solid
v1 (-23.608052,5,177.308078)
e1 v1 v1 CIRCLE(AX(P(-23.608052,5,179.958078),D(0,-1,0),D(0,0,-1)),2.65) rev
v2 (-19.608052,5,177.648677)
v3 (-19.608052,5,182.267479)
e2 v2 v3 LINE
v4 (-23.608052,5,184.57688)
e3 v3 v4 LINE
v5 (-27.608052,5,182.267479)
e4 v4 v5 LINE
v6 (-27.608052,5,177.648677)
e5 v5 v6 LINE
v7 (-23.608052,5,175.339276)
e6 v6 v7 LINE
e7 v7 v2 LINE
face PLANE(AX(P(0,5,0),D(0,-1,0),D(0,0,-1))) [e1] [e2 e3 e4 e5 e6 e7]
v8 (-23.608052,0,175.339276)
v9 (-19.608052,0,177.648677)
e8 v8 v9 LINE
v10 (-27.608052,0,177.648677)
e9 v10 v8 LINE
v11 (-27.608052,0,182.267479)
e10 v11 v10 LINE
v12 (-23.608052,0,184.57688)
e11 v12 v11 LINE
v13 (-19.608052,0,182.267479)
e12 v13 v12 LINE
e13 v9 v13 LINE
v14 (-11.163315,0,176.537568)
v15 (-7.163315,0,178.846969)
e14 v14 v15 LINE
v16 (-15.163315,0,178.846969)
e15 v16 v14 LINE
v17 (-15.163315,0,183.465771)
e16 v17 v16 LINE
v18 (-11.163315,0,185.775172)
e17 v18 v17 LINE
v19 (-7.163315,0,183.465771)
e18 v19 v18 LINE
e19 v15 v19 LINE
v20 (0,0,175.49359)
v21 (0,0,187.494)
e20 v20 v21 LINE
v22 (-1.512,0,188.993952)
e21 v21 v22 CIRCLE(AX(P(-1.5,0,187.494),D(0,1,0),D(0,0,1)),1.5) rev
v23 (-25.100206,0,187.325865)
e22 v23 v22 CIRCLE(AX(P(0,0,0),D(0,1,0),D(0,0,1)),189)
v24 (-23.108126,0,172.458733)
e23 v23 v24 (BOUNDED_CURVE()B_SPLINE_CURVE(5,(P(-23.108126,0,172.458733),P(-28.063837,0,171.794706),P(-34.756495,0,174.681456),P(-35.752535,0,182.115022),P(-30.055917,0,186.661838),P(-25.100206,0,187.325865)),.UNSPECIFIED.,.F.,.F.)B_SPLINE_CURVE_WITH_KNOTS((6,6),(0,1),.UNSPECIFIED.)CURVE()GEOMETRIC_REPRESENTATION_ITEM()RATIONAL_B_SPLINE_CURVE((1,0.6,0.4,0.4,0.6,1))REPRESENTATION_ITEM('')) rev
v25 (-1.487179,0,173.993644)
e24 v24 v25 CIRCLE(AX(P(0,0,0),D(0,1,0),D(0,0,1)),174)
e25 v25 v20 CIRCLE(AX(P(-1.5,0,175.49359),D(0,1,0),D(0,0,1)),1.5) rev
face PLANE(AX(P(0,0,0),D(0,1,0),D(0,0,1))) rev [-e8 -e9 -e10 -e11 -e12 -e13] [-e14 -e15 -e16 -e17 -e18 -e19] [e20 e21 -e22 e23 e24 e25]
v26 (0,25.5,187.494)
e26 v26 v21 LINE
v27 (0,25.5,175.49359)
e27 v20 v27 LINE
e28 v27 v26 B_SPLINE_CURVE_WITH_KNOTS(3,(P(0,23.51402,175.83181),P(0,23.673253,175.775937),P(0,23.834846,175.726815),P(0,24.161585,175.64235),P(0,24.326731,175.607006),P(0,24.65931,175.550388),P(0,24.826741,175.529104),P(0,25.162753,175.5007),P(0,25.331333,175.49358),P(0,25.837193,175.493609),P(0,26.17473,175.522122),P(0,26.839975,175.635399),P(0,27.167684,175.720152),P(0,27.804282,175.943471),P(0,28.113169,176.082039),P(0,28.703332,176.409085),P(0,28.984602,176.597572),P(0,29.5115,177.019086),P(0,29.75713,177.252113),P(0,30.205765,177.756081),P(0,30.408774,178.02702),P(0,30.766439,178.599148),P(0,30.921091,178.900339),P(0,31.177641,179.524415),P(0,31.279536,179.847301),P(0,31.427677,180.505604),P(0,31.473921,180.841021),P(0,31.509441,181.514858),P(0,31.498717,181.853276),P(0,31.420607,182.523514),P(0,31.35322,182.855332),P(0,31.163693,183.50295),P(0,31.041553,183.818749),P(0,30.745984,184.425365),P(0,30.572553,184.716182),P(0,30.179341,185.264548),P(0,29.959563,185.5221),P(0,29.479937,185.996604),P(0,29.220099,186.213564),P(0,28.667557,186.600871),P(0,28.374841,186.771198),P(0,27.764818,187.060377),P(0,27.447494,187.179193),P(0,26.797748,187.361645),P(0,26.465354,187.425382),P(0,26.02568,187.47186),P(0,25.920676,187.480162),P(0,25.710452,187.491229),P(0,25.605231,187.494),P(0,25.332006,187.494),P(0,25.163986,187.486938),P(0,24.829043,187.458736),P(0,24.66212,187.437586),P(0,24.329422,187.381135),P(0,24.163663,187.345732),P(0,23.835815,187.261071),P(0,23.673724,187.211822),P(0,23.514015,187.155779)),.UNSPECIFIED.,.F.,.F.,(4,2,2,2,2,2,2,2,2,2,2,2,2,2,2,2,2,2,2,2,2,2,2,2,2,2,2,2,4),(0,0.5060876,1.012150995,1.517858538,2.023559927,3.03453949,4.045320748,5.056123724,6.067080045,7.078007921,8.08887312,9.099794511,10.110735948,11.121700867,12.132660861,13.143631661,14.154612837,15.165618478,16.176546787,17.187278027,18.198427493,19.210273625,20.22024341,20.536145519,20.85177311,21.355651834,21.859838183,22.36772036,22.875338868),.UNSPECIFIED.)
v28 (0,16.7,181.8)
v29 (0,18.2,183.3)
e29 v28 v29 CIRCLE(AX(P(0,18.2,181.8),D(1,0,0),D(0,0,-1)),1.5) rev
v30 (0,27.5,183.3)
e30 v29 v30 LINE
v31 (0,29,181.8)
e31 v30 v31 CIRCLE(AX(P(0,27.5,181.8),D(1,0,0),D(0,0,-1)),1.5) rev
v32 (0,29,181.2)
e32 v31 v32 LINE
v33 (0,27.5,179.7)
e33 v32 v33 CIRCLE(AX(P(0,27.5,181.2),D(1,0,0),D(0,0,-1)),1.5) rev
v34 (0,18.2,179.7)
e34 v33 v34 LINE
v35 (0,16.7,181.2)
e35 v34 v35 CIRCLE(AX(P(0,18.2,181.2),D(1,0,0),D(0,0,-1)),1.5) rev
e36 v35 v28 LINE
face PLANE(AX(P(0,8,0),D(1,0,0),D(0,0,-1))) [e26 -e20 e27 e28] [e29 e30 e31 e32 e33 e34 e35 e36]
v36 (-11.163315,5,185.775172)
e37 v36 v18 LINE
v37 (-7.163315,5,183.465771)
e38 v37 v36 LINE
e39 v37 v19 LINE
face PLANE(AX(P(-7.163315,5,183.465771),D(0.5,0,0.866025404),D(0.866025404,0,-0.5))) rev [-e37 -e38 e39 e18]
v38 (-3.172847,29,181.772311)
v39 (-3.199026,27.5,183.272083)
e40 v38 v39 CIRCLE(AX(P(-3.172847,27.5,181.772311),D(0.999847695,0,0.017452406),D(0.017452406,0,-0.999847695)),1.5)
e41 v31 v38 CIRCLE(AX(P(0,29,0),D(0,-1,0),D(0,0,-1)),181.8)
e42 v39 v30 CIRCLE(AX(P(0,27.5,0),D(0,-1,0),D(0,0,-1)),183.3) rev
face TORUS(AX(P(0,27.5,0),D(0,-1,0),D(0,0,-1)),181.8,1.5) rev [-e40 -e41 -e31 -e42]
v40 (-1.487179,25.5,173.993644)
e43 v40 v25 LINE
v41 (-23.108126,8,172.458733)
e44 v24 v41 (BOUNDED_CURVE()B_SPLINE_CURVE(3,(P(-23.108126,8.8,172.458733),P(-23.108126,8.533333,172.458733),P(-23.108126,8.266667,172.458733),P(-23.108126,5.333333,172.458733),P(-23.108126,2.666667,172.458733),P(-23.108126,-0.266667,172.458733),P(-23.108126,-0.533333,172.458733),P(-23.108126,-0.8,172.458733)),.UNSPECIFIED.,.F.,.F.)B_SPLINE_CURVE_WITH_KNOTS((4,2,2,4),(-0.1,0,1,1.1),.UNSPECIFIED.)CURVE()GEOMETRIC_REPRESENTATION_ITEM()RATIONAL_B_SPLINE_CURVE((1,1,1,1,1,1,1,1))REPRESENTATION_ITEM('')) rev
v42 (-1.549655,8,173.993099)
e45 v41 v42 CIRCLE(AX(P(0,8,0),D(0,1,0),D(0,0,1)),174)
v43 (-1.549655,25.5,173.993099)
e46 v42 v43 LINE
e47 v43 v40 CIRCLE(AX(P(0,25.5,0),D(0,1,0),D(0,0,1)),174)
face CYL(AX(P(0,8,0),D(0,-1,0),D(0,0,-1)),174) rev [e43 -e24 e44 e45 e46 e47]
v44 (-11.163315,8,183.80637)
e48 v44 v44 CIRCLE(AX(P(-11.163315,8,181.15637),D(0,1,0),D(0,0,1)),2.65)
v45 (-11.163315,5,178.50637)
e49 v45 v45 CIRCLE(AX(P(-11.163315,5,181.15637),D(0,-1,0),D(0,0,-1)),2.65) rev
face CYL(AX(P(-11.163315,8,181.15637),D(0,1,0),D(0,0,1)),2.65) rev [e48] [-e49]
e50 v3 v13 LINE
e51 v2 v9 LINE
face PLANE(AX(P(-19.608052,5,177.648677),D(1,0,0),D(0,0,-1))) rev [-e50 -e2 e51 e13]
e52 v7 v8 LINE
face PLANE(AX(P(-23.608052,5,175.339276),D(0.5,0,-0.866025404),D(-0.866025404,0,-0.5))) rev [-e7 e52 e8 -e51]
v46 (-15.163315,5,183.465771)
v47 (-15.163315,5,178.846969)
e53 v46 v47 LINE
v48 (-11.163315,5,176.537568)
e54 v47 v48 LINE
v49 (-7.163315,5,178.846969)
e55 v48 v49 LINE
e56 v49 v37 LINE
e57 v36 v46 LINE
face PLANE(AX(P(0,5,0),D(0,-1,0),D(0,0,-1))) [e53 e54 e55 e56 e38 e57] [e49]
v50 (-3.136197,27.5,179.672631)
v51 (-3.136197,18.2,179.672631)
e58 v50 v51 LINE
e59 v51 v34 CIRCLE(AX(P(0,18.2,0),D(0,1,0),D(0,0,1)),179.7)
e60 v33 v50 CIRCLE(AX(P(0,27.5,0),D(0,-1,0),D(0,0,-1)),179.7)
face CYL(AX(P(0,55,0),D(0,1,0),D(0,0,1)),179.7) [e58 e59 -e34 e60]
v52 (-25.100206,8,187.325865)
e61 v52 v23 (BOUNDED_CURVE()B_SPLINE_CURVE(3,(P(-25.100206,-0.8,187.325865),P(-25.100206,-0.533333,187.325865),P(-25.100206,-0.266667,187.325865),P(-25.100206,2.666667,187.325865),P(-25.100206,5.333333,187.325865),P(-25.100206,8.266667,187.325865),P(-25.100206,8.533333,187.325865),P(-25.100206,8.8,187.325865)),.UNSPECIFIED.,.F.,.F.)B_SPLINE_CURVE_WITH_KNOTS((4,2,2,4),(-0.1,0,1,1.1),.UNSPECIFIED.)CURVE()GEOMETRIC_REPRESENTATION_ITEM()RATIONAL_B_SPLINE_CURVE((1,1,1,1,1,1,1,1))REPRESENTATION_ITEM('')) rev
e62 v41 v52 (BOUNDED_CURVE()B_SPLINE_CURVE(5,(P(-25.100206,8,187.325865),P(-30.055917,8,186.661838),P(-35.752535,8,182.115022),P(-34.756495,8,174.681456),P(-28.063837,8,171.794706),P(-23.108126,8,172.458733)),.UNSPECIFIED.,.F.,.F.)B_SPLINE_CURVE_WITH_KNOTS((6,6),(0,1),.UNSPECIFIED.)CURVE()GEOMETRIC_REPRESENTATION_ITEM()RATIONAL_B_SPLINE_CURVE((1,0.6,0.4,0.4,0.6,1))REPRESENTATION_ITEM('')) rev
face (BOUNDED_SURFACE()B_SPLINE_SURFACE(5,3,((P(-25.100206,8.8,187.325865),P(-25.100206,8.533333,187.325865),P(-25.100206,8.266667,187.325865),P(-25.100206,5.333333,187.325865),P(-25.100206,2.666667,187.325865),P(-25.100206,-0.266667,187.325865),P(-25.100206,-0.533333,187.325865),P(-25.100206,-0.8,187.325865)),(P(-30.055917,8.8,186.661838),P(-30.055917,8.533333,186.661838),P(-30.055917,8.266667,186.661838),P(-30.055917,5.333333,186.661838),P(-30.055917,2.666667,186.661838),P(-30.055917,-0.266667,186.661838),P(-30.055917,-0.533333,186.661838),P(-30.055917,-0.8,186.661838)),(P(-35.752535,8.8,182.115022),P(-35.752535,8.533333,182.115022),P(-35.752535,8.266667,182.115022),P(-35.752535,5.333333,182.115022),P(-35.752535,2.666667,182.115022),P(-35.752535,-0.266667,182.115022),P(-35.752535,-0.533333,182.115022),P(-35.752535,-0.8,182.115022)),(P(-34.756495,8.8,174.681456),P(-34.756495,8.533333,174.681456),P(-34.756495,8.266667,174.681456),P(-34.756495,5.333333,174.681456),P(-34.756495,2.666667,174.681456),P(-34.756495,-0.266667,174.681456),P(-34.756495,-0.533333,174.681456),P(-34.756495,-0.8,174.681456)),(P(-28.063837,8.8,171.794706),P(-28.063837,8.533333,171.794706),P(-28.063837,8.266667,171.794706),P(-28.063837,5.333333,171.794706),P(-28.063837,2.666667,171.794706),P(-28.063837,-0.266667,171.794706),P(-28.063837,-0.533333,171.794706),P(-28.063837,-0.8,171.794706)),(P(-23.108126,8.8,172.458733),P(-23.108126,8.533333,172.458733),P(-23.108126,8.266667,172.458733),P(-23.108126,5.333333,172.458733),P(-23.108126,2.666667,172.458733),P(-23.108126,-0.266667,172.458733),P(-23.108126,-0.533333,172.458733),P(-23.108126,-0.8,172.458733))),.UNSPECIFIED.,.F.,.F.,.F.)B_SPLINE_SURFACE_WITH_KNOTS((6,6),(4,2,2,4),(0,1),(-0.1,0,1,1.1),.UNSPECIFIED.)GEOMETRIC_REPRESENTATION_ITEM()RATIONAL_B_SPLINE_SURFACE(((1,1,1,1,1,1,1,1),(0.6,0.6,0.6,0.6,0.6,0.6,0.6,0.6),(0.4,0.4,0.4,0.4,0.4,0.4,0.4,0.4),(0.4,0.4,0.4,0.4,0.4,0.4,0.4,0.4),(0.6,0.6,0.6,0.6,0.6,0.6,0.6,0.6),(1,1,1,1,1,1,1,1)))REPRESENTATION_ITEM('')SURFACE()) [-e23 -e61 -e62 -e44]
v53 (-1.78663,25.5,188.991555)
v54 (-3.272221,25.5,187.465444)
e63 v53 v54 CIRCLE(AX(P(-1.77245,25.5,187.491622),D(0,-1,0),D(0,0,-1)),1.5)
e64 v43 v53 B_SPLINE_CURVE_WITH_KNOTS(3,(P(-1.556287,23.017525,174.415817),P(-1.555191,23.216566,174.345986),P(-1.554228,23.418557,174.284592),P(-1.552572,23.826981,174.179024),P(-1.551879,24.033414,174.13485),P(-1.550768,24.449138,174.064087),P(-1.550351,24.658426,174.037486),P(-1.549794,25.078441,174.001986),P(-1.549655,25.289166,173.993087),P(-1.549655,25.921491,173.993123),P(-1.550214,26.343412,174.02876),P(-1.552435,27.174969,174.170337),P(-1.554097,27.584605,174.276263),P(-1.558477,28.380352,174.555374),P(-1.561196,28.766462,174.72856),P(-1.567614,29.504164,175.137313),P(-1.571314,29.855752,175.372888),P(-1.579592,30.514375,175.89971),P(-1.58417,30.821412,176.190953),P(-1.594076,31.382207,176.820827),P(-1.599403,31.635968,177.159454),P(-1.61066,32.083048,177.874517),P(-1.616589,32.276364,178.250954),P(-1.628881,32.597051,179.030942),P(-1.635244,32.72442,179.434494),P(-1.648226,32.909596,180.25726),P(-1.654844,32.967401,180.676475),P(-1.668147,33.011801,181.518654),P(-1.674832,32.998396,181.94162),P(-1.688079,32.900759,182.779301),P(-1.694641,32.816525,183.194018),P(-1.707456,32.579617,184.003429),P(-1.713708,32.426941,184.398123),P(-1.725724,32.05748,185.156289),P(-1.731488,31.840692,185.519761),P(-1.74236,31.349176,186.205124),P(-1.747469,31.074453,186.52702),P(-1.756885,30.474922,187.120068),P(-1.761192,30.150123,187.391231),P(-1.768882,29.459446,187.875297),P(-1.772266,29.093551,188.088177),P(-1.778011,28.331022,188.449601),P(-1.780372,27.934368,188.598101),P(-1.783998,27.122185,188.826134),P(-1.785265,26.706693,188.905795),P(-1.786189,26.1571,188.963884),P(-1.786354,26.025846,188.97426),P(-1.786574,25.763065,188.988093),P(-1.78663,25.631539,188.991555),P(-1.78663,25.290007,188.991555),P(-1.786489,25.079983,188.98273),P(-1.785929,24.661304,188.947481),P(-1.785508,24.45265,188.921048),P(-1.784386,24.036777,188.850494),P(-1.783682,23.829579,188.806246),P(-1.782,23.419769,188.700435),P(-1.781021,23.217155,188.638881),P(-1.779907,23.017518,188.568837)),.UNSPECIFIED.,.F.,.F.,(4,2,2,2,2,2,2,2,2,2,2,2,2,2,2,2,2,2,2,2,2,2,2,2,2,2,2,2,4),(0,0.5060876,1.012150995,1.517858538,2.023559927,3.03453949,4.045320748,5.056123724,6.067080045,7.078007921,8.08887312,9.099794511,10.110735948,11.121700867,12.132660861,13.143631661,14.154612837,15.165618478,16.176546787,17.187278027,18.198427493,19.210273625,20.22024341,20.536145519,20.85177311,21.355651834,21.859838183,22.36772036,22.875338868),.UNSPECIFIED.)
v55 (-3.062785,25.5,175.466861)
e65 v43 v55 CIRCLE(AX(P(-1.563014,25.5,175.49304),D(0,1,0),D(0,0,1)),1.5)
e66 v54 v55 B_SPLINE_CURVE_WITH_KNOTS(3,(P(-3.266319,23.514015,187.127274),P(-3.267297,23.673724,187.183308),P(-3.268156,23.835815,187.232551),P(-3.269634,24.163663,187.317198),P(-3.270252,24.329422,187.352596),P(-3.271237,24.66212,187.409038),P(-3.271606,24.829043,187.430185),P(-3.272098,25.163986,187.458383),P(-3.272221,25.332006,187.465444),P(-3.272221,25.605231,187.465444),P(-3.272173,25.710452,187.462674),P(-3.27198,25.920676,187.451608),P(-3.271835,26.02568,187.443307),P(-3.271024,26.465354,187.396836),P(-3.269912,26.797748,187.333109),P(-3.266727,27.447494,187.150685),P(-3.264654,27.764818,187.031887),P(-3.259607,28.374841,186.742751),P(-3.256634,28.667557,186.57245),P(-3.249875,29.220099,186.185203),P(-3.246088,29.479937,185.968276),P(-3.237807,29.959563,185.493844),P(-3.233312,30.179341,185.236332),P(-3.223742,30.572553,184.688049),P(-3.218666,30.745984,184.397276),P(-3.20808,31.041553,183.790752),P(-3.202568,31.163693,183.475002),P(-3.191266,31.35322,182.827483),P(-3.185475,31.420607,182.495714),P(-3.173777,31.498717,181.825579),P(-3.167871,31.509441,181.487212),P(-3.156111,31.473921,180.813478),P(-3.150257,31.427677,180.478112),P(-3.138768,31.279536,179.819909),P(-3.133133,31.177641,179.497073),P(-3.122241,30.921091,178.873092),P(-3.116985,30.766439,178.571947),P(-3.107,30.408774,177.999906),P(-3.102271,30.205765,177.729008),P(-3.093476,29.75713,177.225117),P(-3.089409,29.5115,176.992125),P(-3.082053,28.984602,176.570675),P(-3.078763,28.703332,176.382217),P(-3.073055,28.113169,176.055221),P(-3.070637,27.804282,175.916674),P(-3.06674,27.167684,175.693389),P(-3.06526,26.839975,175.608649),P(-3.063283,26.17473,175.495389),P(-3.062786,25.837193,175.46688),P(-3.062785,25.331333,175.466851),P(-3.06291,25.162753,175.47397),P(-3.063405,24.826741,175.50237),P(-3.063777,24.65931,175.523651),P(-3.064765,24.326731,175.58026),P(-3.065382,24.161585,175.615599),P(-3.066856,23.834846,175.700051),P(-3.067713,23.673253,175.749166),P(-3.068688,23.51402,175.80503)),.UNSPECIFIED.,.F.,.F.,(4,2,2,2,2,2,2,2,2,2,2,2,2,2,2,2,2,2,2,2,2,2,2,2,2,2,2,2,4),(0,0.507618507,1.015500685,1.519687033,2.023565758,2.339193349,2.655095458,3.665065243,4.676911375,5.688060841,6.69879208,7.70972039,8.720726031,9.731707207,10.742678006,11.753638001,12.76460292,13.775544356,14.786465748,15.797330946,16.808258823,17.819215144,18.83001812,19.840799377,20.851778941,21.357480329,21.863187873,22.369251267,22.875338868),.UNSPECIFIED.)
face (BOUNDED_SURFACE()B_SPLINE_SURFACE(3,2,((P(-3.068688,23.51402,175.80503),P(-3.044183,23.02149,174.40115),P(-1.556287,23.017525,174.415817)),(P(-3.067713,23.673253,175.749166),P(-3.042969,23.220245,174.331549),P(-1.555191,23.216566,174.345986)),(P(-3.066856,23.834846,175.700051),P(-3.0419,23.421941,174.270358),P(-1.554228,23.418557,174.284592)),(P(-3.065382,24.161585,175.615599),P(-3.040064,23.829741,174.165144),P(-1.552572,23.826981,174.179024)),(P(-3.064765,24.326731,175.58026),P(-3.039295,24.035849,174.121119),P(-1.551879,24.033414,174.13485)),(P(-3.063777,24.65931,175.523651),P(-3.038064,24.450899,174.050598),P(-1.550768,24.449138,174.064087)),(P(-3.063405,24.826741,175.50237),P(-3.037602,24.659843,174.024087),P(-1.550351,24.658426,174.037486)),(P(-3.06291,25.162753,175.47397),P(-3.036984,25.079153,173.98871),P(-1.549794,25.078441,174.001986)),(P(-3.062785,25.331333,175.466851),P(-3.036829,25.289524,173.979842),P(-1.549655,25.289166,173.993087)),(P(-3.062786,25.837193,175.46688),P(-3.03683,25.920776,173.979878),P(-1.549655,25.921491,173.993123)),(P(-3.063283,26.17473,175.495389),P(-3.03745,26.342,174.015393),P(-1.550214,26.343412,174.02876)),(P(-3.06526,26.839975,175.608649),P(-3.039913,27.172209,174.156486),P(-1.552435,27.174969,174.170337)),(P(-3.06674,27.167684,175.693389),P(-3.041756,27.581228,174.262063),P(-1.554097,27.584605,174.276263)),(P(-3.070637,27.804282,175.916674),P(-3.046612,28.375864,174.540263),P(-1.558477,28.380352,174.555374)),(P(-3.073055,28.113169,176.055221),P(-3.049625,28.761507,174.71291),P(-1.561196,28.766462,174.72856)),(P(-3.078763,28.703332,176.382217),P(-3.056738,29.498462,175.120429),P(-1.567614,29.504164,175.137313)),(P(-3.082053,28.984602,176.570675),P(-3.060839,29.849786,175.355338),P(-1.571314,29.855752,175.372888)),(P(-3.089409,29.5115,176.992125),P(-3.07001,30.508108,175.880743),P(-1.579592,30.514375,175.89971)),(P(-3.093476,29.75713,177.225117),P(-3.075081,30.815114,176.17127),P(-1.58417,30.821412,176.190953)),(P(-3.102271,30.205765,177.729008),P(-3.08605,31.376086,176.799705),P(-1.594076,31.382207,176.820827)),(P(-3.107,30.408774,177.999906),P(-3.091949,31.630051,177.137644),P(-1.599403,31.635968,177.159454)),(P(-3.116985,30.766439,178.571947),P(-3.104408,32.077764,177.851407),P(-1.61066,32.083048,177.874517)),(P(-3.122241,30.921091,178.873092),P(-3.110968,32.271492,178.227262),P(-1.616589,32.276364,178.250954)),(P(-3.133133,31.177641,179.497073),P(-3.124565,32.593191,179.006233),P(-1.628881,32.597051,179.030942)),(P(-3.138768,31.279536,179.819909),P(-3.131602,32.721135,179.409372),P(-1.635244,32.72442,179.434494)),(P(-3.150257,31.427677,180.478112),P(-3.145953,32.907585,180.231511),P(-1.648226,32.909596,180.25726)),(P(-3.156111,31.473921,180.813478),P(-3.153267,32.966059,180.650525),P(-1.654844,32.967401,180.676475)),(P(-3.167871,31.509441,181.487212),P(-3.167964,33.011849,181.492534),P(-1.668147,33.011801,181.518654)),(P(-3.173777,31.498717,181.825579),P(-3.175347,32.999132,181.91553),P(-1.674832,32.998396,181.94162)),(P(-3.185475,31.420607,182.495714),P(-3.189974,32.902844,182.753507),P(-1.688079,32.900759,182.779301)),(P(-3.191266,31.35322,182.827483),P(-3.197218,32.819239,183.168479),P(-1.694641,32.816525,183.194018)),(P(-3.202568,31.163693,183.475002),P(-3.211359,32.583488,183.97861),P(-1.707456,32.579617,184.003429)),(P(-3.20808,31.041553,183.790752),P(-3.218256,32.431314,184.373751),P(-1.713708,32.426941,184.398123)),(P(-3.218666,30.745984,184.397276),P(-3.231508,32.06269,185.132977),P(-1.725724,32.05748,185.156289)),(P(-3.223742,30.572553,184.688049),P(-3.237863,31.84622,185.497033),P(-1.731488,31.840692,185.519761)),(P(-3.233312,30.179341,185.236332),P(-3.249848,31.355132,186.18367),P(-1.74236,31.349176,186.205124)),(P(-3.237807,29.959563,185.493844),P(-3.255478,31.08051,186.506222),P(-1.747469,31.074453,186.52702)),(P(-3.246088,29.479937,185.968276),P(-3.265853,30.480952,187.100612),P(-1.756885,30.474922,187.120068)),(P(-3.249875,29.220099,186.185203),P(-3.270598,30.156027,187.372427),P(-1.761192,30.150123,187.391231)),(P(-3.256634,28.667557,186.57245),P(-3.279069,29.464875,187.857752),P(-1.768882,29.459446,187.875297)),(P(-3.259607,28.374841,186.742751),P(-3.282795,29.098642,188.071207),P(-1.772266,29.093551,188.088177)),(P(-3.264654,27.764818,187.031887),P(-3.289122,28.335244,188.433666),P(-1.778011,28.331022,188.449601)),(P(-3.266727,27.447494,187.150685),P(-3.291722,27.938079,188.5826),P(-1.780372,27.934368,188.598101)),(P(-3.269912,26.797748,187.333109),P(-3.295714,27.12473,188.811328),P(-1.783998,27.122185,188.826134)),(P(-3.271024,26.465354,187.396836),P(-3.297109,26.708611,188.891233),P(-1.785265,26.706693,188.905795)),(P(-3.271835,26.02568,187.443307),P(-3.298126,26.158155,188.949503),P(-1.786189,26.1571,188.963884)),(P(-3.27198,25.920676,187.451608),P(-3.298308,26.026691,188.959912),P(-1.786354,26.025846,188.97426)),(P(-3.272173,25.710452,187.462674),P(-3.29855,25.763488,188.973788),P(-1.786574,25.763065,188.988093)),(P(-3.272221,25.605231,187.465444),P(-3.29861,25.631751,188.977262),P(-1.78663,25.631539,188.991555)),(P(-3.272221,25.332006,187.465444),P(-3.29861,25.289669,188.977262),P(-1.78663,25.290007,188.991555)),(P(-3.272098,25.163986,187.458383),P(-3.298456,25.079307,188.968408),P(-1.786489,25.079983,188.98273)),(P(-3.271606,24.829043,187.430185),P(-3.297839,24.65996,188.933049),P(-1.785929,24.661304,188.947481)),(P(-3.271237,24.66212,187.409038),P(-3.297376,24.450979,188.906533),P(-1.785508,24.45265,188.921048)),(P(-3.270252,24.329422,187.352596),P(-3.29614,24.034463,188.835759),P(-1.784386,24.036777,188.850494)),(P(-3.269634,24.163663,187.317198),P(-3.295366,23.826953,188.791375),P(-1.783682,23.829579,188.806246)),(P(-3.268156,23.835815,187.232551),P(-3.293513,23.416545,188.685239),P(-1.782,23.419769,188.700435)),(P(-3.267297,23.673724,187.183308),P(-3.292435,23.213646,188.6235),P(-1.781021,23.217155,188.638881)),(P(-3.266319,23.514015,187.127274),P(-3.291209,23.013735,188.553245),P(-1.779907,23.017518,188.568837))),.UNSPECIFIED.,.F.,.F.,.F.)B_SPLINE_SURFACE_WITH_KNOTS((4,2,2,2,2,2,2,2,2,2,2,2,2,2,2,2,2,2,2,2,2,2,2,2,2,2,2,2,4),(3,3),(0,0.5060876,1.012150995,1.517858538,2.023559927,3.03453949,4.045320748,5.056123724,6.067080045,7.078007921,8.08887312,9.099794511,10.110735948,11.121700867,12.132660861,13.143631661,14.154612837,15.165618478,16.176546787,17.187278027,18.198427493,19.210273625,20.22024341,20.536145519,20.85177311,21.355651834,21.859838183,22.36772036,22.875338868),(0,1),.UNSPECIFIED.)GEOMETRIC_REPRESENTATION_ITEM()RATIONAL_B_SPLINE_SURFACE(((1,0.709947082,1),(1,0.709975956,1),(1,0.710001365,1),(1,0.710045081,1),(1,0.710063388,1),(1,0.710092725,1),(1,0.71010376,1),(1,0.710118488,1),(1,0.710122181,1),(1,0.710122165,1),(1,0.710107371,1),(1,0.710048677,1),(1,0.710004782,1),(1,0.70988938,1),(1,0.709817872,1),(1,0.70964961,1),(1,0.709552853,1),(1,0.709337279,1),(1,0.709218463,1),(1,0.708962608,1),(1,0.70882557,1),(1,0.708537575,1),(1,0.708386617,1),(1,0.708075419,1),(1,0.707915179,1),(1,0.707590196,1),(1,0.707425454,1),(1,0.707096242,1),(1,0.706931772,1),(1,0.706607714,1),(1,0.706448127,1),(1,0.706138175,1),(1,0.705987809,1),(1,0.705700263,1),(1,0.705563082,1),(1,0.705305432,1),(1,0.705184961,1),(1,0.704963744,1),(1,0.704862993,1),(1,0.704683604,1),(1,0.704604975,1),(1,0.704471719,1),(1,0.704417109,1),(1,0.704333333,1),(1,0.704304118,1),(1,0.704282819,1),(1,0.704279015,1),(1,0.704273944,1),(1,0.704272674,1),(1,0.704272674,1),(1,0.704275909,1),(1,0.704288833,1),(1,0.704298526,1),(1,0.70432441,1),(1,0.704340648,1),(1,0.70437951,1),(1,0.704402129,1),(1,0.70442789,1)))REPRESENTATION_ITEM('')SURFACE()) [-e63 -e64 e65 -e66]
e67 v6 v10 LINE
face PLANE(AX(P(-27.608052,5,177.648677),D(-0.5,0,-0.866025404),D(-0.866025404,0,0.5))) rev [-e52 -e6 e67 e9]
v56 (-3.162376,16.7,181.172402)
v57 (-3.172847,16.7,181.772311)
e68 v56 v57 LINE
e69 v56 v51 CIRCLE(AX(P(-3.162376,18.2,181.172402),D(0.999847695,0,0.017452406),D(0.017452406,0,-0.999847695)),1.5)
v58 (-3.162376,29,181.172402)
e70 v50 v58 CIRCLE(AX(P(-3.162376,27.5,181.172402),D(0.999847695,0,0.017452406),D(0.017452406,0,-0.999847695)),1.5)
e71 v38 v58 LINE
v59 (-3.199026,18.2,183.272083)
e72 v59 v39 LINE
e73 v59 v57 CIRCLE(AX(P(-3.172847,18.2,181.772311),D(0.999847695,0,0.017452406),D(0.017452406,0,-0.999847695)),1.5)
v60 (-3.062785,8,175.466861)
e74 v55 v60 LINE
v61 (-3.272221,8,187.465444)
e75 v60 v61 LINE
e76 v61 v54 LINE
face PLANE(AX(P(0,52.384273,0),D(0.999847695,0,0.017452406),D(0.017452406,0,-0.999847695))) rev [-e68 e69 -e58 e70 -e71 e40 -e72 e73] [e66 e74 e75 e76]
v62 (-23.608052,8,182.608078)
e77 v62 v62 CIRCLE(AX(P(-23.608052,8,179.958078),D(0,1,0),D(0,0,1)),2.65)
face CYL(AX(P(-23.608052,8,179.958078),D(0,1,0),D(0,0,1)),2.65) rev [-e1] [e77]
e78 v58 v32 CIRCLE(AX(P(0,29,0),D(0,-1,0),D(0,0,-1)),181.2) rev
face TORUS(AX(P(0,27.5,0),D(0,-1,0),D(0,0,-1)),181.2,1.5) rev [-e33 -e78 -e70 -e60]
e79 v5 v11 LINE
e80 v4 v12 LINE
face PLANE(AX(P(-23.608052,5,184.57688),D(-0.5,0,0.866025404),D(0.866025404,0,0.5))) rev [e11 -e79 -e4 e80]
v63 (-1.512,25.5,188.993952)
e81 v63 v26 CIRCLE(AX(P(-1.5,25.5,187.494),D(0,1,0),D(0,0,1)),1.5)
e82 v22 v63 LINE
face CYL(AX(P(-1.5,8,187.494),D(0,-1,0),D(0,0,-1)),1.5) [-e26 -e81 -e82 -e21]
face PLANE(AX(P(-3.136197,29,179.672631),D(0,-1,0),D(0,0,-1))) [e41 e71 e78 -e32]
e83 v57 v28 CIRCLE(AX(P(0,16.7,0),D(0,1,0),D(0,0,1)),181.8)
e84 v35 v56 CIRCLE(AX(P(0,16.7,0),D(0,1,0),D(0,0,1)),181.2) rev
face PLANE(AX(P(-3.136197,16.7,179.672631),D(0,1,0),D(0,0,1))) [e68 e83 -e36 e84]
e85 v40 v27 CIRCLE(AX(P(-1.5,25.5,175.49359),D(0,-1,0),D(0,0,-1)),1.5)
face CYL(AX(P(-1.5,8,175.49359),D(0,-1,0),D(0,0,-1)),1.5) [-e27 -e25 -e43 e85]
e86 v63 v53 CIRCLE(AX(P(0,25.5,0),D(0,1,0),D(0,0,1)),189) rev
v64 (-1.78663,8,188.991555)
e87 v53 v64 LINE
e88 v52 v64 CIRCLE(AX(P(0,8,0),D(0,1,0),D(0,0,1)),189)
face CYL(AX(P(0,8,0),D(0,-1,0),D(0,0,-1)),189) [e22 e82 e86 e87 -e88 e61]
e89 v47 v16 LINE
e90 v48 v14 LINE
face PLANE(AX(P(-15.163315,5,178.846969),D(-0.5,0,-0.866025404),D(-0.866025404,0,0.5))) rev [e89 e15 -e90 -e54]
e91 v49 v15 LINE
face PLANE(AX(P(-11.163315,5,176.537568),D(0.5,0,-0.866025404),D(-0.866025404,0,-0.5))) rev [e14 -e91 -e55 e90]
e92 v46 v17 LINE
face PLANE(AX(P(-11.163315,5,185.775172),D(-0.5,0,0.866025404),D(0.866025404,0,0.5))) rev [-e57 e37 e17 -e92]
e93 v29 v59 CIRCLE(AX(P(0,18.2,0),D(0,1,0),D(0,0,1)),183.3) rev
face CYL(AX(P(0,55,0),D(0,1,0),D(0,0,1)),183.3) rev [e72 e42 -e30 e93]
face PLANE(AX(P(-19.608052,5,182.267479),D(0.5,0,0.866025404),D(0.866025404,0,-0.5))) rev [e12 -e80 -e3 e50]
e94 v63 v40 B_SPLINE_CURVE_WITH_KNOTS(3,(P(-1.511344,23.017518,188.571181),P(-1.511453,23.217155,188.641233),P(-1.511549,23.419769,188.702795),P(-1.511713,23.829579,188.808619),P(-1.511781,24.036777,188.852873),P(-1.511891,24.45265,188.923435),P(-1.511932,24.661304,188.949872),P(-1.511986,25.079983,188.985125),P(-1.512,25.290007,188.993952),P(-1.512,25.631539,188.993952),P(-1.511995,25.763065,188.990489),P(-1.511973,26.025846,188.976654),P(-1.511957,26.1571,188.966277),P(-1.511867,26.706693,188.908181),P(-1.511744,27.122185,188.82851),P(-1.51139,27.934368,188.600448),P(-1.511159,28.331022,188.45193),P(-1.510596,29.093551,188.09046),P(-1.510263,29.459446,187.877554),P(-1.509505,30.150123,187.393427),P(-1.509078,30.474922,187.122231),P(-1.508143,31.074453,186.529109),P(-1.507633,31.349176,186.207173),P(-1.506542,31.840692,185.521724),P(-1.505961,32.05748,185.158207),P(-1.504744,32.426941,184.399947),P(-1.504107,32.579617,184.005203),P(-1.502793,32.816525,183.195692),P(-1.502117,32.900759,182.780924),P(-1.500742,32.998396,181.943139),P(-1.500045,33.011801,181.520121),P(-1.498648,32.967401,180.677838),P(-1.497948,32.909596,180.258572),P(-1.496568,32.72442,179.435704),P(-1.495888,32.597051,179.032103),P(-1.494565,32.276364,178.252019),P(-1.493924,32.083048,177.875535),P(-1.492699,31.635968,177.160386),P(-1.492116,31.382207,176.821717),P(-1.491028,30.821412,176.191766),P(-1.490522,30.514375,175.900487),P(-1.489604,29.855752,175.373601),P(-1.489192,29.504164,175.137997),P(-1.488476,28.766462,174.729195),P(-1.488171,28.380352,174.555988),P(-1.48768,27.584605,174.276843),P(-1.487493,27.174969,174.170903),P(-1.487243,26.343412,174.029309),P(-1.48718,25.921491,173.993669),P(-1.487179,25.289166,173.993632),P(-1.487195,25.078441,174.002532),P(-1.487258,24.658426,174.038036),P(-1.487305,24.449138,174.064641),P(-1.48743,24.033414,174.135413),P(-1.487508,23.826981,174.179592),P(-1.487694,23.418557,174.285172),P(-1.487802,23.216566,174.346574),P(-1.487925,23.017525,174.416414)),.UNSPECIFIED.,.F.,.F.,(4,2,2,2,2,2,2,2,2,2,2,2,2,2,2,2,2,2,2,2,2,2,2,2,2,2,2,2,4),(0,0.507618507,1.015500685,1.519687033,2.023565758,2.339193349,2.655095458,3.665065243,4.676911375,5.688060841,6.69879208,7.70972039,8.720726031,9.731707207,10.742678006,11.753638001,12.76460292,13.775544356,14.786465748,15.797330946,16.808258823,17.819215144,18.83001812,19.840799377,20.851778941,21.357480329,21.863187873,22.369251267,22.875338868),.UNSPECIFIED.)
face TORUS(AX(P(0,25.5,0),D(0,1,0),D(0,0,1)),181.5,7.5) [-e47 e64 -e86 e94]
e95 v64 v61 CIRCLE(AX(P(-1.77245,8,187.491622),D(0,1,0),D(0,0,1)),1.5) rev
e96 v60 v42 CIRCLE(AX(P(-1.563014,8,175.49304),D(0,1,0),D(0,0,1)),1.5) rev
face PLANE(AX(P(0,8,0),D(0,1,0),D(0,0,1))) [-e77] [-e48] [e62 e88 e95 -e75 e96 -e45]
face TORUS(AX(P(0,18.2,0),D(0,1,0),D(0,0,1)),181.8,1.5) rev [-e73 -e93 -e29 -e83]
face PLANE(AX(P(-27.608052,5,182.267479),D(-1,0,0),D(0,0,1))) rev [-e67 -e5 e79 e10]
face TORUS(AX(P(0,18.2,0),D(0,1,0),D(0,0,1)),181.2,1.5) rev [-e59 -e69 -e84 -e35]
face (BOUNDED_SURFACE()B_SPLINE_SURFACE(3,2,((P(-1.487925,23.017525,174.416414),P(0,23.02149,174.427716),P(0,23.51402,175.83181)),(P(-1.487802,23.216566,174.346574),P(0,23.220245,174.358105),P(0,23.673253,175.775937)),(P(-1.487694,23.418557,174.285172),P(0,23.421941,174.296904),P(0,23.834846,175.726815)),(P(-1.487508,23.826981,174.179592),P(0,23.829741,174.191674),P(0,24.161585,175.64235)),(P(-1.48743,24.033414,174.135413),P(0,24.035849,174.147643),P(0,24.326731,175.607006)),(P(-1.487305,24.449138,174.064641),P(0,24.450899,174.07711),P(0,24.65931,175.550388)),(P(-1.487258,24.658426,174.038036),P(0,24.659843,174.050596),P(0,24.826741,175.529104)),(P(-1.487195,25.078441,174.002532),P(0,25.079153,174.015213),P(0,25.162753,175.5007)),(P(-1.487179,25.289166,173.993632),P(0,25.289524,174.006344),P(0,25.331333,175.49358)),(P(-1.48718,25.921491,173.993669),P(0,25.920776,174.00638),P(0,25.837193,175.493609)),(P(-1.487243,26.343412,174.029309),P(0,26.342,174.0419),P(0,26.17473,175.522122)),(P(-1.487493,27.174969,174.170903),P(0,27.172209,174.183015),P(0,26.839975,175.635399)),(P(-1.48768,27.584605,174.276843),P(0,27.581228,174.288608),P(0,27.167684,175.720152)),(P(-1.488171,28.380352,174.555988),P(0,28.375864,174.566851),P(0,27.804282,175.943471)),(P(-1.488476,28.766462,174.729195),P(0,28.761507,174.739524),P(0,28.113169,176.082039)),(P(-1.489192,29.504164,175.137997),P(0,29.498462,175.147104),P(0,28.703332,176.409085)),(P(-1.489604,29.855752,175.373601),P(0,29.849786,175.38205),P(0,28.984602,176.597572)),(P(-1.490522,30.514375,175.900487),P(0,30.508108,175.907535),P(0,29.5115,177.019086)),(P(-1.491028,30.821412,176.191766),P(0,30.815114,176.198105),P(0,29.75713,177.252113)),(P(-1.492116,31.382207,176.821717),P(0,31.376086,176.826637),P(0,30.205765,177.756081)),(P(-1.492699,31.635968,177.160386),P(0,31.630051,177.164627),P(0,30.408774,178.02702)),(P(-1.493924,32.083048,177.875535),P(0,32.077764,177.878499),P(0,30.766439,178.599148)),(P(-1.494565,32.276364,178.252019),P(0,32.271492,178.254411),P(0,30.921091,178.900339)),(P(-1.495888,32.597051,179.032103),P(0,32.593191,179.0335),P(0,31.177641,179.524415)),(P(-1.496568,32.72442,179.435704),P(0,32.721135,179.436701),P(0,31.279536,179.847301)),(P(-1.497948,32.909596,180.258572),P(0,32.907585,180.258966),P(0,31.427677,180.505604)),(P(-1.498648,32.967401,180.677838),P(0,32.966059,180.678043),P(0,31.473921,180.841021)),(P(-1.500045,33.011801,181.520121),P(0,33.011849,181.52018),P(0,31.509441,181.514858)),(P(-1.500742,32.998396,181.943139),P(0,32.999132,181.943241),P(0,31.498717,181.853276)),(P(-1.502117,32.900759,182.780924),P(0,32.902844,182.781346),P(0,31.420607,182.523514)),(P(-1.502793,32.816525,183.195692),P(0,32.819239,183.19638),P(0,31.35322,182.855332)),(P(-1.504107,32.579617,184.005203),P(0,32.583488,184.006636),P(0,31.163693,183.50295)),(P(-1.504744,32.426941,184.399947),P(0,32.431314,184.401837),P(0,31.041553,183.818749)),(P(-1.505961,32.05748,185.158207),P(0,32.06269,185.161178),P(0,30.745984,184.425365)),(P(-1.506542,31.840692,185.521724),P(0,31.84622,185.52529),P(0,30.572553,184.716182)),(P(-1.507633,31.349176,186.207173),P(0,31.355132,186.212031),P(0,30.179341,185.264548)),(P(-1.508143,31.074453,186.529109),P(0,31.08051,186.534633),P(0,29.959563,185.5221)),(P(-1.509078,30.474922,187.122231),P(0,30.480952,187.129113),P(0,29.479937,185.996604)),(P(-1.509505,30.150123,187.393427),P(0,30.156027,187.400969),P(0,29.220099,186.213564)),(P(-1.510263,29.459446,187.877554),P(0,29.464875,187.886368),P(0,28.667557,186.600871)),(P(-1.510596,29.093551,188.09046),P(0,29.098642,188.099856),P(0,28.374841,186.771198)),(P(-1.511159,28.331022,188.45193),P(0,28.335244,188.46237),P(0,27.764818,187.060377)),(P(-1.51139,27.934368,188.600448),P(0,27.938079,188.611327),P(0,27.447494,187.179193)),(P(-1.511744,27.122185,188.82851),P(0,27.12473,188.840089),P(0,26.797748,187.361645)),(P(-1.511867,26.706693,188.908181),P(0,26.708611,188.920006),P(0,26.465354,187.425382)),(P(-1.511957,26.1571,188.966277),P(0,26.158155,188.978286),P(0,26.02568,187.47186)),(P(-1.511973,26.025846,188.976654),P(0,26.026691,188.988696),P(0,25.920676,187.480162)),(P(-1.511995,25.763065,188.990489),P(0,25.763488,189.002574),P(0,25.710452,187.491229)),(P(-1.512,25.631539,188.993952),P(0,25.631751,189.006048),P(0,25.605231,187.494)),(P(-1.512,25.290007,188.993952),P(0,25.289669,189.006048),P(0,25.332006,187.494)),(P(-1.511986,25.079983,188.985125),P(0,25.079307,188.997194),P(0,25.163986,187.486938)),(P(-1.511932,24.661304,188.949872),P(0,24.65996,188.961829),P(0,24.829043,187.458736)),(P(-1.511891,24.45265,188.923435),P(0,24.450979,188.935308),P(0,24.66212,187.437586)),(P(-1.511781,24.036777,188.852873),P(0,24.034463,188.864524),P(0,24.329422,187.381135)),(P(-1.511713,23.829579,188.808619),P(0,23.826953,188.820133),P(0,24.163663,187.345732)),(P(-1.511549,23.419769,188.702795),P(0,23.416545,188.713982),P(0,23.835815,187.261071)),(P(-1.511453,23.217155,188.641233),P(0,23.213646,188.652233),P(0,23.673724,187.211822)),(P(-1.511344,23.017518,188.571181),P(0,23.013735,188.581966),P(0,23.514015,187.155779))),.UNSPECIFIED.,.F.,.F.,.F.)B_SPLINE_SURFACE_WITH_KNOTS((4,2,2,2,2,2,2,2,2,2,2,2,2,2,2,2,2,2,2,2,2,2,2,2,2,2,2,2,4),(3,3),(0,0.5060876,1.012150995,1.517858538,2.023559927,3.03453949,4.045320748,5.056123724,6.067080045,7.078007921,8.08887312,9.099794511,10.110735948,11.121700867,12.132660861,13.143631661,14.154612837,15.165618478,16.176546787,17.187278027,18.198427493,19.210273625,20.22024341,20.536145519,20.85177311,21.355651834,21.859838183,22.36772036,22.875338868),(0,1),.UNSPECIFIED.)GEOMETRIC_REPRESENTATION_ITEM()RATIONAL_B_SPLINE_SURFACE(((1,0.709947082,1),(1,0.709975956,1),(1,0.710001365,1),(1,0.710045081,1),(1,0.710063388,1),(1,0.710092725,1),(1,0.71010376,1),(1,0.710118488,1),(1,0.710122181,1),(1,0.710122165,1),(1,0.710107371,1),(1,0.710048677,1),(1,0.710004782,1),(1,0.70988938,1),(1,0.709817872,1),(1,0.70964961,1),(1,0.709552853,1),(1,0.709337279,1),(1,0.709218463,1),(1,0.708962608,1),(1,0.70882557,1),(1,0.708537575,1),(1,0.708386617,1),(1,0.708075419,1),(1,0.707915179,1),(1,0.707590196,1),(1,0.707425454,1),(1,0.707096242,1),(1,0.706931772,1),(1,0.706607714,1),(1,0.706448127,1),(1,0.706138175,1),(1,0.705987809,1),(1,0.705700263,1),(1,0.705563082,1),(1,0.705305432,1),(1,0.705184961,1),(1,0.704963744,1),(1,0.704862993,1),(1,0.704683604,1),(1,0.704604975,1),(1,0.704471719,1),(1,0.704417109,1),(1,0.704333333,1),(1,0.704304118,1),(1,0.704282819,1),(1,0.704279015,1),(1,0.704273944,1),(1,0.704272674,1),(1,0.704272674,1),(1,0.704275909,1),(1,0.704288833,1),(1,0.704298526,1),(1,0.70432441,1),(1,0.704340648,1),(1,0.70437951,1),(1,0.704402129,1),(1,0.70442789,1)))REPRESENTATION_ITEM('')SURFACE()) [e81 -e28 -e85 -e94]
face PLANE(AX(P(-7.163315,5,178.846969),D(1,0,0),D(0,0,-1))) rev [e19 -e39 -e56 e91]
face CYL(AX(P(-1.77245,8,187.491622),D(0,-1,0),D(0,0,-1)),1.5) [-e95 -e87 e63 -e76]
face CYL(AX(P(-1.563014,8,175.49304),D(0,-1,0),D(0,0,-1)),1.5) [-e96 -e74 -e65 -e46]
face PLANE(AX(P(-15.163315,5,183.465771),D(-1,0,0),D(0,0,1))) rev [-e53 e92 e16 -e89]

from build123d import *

# Parameters (mm, degrees)
EXTRUDE_1_DEPTH     = 8
EXTRUDE_2_DEPTH     = 25
HOLE_WIZARD_M5_1_D  = 5.3
FILLET_1_R          = 7.5
FILLET_2_DEPTH      = 8
SKETCH_5_W          = 3.5999999999999943
SKETCH_5_H          = 12.29999999986595
FILLET_3_R          = 1.5
FILLET_4_R          = 1.5
CUT_EXTRUDE_1_DEPTH = 5


with BuildPart() as part:
    # 草图1 → 凸台-拉伸1 (new body)
    with BuildSketch(Plane(origin=(0, 0, 0), x_dir=(1, 0, 0), z_dir=(0, 1, 0))):
        with BuildLine():
            Line((2.098e-14, -189), (1.932e-14, -174.00000000000003))
            ThreePointArc((2.28618e-12, -174.00000000000003), (-15.165099238093463, -173.33787746796366), (-30.214782914050144, -171.35654902412347))
            Line((-30.214782914045937, -171.35654902412418), (-32.8195055790499, -186.12866531930732))
            ThreePointArc((-32.81950557905, -186.12866531930732), (-16.472435379307413, -188.28079793933995), (-3.472e-14, -189.00000000000003))
        make_face()
    extrude(amount=EXTRUDE_1_DEPTH)

    # 草图4 → 凸台-拉伸2 (add)
    with BuildSketch(Plane(origin=(0, 8, 0), x_dir=(1, 0, 0), z_dir=(0, 1, 0))):
        with BuildLine():
            Line((2.082e-14, -189), (1.916e-14, -174))
            ThreePointArc((-3.196e-14, -174.00000000000003), (-1.5184171767173116, -173.99337461316583), (-3.0367187200877925, -173.9734989572121))
            Line((-3.036718720087315, -173.97349895721206), (-3.298504816646567, -188.97121438455795))
            ThreePointArc((-3.2985048166465822, -188.971214384558), (-1.6493152091926062, -188.99280345912842), (-3.472e-14, -189.00000000000006))
        make_face()
    extrude(amount=EXTRUDE_2_DEPTH)

    # M5 间隙孔1 (through all)
    with Locations(Plane(origin=(0, 8, 0), x_dir=(1, 0, 0), z_dir=(0, 1, 0))):
        with Locations((-23.608051681, -179.958078162), (-11.163314825, -181.156370029)):
            Hole(HOLE_WIZARD_M5_1_D / 2)

    # 圆角1
    # the kernel refuses this fillet: 7.5 mm, written as the material it takes off along each edge
    with BuildSketch(Plane(origin=(1.47232e-12, 33, -1.0760459e-10), x_dir=(0.10755019962978496, 0, 0.9941996552803635), z_dir=(0.9941996552803635, 0, -0.10755019962978496))) as fillet_1_piece_1:
        with BuildLine():
            CenterArc((174.00000000010766 + FILLET_1_R, FILLET_1_R), FILLET_1_R, 180, 89.99999999999977)
            Line((174.00000000010766 + FILLET_1_R, 0), (174.00000000010766, 0))
            Line((174.00000000010766, 0), (174.00000000010766, FILLET_1_R))
        make_face()
    fillet_1_piece_1_solid = revolve(axis=Axis((1.47232e-12, 33, -1.0760459e-10), (0, -1, 0)), revolution_arc=13.348228955549553, mode=Mode.PRIVATE)
    with BuildSketch(Plane(origin=(2.05469e-12, 33, -2.9481839e-10), x_dir=(-0.11639521392683701, 0, 0.9932029773288671), z_dir=(-0.9932029773288671, 0, -0.11639521392683701))) as fillet_1_piece_2:
        with BuildLine():
            CenterArc((189.0000000002949 - FILLET_1_R, -FILLET_1_R), FILLET_1_R, 0, 89.99999999999957)
            Line((189.0000000002949 - FILLET_1_R, 0), (189.0000000002949, 0))
            Line((189.0000000002949, 0), (189.00000000029488, -FILLET_1_R))
        make_face()
    fillet_1_piece_2_solid = revolve(axis=Axis((2.05469e-12, 33, -2.9481839e-10), (0, 1, 0)), revolution_arc=12.368210784462358, mode=Mode.PRIVATE)
    add([fillet_1_piece_1_solid, fillet_1_piece_2_solid], mode=Mode.SUBTRACT)

    # 圆角2: read off the stored shape, not the designer's step
    # 圆角2 outline → 圆角2 (cut)
    with BuildSketch(Plane(origin=(0, 0, 0), x_dir=(1, 0, 0), z_dir=(0, 1, 0))):
        with BuildLine():
            ThreePointArc((-32.819505579, -186.128665319), (-28.966041771, -186.767150281), (-25.100206236, -187.325864863))
            add(Edge.make_bspline(
                [(-25.100206236, -187.325864863), (-27.006863278382305, -187.07038767754574), (-29.132080374521447, -186.17341393049847), (-31.048536919413714, -184.35464406978926), (-32.02623112721157, -181.62978297542463), (-31.490224503, -178.589937725)],
                knots=[0, 0, 0, 0, 0, 0, 0.5103349834155644, 0.5103349834155644, 0.5103349834155644, 0.5103349834155644, 0.5103349834155644, 0.5103349834155644], degree=5, weights=[1, 0.7958660065557144, 0.6438203721908997, 0.5438630969055563, 0.4959941806996843, 0.5002136235732837]))
            Line((-31.490224503, -178.589937725), (-32.819505579, -186.128665319))
        make_face()
        with BuildLine():
            Line((-30.214782914, -171.356549024), (-31.490224503, -178.589937725))
            add(Edge.make_bspline(
                [(-31.490224503, -178.589937725), (-30.984360135627078, -175.72103774319677), (-29.29551148466263, -173.58668082656104), (-27.075163325391554, -172.48015181385665), (-24.918748626576246, -172.21612345785414), (-23.108126376, -172.458732732)],
                knots=[0.5103349834155644, 0.5103349834155644, 0.5103349834155644, 0.5103349834155644, 0.5103349834155644, 0.5103349834155644, 1, 1, 1, 1, 1, 1], degree=5, weights=[0.5002136235732837, 0.5042621674352976, 0.5562650770089762, 0.6562223522943196, 0.8041339932913276, 1]))
            ThreePointArc((-23.108126376, -172.458732732), (-26.667149567, -171.944360576), (-30.214782914, -171.356549024))
        make_face()
    extrude(amount=FILLET_2_DEPTH, mode=Mode.SUBTRACT)

    # 草图5 → 切除-旋转1 (revolve, cut)
    with BuildSketch(Plane(origin=(0, 0, 0), x_dir=(-0.01745240643728342, 0, 0.9998476951563913), z_dir=(-0.9998476951563913, 0, -0.01745240643728342))):
        with Locations((181.5, 22.85000000006228)):
            Rectangle(SKETCH_5_W, SKETCH_5_H)
    revolve(axis=Axis((0, 55.00000000000001, 0), (0, -1, 0)), mode=Mode.SUBTRACT)

    # 圆角3
    fillet_3_edges = [part.edges().sort_by_distance(p)[0] for p in [
        (-1.5995739568519802, 28.999999999995254, 183.2930204976626),
        (-1.5995739568519802, 16.700000000129307, 183.2930204976626),
        (-1.5681584290578334, 16.700000000129307, 179.6931575746316),
        (-1.5681584290578334, 28.999999999995254, 179.6931575746316),
    ]]
    fillet(fillet_3_edges, radius=FILLET_3_R)

    # 圆角4
    fillet_4_edges = [part.edges().sort_by_distance(p)[0] for p in [
        (-8.43e-15, 12.75, 189.00000000000003),
        (-3.2985048166465747, 16.75, 188.97121438455798),
        (-3.0367187200875536, 16.75, 173.9734989572121),
        (7.049e-13, 12.75, 174.00000000000003),
        (-1.5838661929561955, 33, 181.4930890361471),
        (-1.5838661929561955, 33, 181.4930890361471),
    ]]
    fillet(fillet_4_edges, radius=FILLET_4_R)

    # 草图6 → 切除-拉伸1 (cut)
    with BuildSketch(Plane.XZ):
        Polygon((-23.608051681342314, 175.33927600862347), (-19.608051681342303, 177.648677085382), (-19.608051681342303, 182.267479238899), (-23.608051681342307, 184.5768803156575), (-27.608051681342282, 182.267479238899), (-27.608051681342282, 177.64867708538196), align=None)
        Polygon((-11.163314825368905, 176.53756787555398), (-7.163314825368916, 178.84696895231247), (-7.163314825368916, 183.4657711058294), (-11.163314825368891, 185.7751721825879), (-15.16331482536884, 183.46577110582942), (-15.16331482536884, 178.84696895231244), align=None)
    extrude(amount=-CUT_EXTRUDE_1_DEPTH, mode=Mode.SUBTRACT)


solid = part.part
